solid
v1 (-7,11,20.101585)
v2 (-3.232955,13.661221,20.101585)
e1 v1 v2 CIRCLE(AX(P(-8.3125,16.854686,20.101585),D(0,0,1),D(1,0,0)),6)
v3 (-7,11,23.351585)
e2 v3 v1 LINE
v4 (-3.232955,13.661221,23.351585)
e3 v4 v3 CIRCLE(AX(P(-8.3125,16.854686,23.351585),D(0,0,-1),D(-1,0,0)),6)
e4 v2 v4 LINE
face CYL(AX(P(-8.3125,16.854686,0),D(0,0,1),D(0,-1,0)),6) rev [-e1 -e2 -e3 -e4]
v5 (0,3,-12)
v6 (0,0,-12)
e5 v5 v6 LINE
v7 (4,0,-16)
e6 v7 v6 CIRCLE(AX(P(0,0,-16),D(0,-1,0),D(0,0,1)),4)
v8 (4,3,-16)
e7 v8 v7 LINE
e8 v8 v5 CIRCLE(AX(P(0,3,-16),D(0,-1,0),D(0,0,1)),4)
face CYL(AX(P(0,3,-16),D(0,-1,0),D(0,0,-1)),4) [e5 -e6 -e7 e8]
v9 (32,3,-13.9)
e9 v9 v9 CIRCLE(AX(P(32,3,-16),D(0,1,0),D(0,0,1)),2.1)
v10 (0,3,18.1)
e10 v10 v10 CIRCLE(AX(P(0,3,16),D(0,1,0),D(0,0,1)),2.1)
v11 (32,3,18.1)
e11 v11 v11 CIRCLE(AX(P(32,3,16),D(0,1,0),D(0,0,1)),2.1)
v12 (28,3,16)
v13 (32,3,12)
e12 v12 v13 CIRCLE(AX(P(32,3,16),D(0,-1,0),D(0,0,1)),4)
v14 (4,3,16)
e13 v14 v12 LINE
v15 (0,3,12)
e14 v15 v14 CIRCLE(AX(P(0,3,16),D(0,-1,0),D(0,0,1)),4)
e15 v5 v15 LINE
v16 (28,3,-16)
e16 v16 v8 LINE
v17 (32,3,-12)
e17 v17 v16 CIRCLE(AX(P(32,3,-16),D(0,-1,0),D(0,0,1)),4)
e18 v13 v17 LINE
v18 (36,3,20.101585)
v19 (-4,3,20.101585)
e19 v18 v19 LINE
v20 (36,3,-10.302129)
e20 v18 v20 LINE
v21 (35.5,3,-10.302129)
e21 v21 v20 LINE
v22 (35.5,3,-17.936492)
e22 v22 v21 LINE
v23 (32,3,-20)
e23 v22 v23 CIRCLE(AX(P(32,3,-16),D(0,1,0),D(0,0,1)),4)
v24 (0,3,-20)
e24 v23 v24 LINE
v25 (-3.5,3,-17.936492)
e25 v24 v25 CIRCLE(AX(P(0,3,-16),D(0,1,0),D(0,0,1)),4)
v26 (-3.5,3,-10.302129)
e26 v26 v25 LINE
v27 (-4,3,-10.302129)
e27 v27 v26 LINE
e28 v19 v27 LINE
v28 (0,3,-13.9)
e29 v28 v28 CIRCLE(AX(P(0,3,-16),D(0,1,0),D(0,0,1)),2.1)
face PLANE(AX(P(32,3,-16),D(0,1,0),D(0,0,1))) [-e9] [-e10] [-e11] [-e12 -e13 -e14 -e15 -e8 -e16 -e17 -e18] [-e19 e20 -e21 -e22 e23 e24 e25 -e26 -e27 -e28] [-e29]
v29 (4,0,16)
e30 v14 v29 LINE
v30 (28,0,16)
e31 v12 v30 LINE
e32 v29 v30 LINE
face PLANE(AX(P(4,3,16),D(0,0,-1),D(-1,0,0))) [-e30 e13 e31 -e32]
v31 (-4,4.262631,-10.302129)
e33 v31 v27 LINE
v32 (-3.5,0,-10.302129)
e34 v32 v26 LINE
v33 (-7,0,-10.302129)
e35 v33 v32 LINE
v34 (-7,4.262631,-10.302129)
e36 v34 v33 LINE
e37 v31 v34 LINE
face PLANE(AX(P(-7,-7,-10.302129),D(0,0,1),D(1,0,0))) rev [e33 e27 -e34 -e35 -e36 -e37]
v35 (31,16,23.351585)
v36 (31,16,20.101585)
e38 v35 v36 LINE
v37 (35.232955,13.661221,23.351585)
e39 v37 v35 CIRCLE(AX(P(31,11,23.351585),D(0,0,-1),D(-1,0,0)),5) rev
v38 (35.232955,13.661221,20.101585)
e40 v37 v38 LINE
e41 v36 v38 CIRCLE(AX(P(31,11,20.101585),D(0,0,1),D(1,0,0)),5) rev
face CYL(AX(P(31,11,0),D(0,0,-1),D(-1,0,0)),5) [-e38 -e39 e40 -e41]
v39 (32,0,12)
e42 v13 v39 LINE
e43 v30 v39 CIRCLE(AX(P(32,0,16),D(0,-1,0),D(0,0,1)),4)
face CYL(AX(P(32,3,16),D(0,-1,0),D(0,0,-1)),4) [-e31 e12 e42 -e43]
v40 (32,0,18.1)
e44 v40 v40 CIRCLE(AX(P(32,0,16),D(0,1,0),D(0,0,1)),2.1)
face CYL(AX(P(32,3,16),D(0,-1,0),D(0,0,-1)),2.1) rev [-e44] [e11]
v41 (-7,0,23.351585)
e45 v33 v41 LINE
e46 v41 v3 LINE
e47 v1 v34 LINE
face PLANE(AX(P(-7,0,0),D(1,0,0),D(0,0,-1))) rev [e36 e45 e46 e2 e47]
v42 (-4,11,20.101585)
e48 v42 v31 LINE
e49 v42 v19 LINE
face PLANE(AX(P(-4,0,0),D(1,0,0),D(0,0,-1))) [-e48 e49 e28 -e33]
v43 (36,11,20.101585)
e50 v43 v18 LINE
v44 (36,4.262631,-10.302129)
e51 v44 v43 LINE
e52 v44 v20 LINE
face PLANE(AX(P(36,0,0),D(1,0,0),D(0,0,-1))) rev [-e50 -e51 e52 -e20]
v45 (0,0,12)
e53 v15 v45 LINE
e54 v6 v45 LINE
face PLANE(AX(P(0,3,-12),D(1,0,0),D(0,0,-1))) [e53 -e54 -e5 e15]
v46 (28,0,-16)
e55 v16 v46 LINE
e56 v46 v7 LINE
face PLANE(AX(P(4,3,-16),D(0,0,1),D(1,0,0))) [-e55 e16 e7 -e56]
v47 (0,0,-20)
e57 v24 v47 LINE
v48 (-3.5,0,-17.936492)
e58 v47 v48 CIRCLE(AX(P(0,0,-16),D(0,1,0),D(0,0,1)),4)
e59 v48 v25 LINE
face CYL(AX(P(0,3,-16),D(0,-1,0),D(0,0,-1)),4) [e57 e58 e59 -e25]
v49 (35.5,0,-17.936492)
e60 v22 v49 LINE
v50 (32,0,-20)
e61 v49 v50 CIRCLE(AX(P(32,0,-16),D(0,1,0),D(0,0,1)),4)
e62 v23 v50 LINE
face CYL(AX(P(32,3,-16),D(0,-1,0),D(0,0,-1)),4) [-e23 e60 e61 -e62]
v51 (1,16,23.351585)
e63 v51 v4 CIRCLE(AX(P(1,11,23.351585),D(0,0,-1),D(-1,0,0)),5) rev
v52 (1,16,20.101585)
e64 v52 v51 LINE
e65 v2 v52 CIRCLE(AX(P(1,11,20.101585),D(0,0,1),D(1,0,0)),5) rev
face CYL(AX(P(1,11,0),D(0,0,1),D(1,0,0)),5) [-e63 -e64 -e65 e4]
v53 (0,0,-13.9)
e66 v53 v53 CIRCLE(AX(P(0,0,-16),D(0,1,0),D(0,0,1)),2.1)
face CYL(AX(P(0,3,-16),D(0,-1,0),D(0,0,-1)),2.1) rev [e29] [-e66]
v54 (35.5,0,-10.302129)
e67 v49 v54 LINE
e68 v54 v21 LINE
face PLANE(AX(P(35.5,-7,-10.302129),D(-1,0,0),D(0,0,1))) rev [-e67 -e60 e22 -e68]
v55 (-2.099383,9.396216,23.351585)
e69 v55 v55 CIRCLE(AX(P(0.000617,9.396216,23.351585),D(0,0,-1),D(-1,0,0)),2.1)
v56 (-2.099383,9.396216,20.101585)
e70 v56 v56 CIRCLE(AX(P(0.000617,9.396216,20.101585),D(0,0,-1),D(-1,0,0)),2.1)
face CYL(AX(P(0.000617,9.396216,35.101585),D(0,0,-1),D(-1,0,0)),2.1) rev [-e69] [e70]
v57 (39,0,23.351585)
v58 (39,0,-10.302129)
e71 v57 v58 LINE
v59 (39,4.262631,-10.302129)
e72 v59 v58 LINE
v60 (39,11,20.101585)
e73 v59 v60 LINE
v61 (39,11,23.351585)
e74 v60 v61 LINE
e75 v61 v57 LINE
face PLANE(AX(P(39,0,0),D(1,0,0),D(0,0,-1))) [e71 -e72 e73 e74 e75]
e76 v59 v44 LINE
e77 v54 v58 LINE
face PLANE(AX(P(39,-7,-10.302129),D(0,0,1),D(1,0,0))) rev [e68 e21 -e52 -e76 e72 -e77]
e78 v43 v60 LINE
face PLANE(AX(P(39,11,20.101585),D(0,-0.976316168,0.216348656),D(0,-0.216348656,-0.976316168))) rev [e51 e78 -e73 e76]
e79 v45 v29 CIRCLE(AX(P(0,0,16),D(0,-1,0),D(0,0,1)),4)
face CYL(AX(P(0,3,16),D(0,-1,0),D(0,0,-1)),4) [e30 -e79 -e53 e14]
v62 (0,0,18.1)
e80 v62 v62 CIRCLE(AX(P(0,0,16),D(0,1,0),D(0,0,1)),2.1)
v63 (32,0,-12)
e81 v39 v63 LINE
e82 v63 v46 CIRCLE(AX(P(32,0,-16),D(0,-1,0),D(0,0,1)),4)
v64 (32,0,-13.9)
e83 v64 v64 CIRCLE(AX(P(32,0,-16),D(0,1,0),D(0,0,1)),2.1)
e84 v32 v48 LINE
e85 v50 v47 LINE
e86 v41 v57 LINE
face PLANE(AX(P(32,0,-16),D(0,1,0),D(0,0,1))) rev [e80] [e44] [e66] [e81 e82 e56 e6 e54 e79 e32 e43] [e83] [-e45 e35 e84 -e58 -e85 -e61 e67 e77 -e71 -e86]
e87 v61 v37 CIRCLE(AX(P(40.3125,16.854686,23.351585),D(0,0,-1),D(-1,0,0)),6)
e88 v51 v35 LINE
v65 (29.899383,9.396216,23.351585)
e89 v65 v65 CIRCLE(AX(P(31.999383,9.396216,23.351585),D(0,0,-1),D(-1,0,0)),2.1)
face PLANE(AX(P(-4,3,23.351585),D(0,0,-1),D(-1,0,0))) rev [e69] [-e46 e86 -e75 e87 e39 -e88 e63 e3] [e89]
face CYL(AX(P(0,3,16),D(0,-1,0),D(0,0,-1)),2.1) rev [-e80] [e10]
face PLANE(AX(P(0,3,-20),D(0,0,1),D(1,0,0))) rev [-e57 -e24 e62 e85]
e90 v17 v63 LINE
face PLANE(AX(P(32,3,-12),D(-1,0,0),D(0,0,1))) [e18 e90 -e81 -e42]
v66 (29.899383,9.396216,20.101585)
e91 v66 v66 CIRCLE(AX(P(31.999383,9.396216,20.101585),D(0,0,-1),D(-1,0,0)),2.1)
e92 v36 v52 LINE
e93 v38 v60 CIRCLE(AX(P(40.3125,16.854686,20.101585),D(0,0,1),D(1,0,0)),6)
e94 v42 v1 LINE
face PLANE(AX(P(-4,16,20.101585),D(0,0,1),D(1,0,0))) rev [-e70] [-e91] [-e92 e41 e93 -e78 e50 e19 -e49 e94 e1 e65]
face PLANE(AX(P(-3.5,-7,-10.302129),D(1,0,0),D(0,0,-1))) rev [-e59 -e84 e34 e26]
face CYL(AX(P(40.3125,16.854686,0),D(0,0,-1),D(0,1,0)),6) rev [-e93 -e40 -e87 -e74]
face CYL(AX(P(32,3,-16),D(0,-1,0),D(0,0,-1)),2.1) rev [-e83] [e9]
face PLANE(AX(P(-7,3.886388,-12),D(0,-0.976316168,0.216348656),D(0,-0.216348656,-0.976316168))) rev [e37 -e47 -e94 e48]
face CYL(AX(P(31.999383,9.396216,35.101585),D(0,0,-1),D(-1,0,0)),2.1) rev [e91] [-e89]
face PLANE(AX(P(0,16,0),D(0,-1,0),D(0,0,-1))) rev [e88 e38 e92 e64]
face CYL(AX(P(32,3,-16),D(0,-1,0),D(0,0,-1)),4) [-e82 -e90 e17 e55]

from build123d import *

# Parameters (mm, degrees)
SKETCH1_R           = 2.1
BOSS_EXTRUDE1_DEPTH = 3
SKETCH2_W           = 40
SKETCH2_H           = 3.25
BOSS_EXTRUDE2_DEPTH = 13
SKETCH3_R           = 2.1
CUT_EXTRUDE1_DEPTH  = 15
FILLET1_R           = 5
BOSS_EXTRUDE3_DEPTH = 3
BOSS_EXTRUDE4_DEPTH = 3
FILLET4_R           = 6
SKETCH7_W           = 3.5
SKETCH7_H           = 9.863589554
CUT_EXTRUDE2_DEPTH  = 10
SKETCH8_W           = 3
SKETCH8_H           = 1.69787118
CUT_EXTRUDE3_DEPTH  = 10


with BuildPart() as part:
    # Sketch1 → Boss-Extrude1 (new body)
    with BuildSketch(Plane(origin=(0, 0, 0), x_dir=(1, 0, 0), z_dir=(0, 1, 0))):
        with BuildLine():
            Line((0, 20), (32, 20))
            ThreePointArc((32, 20), (34.828427125, 18.828427125), (36, 16))
            Line((36, 16), (36, -16))
            Line((36, -16), (36, -23.351584796))
            Line((36, -23.351584796), (-4, -23.351584796))
            Line((-4, -23.351584796), (-4, -16))
            Line((-4, -16), (-4, 16))
            ThreePointArc((-4, 16), (-2.828427125, 18.828427125), (0, 20))
        make_face()
        with Locations(Location((0, 16, 0), (0, 0, 270))):
            Circle(SKETCH1_R, mode=Mode.SUBTRACT)
        with Locations(Location((0, -16, 0), (0, 0, 270))):
            Circle(SKETCH1_R, mode=Mode.SUBTRACT)
        with Locations(Location((32, 16, 0), (0, 0, 270))):
            Circle(SKETCH1_R, mode=Mode.SUBTRACT)
        with Locations(Location((32, -16, 0), (0, 0, 270))):
            Circle(SKETCH1_R, mode=Mode.SUBTRACT)
        with BuildLine():
            Line((0, 12), (0, -12))
            ThreePointArc((0, -12), (2.828427125, -13.171572875), (4, -16))
            Line((4, -16), (28, -16))
            ThreePointArc((28, -16), (29.171572875, -13.171572875), (32, -12))
            Line((32, -12), (32, 12))
            ThreePointArc((32, 12), (29.171572875, 13.171572875), (28, 16))
            Line((28, 16), (4, 16))
            ThreePointArc((4, 16), (2.828427125, 13.171572875), (0, 12))
        make_face(mode=Mode.SUBTRACT)
    extrude(amount=BOSS_EXTRUDE1_DEPTH)

    # Sketch2 → Boss-Extrude2 (add)
    with BuildSketch(Plane(origin=(0, 3, 0), x_dir=(1, 0, 0), z_dir=(0, 1, 0))):
        with Locations((16, -21.726584796)):
            Rectangle(SKETCH2_W, SKETCH2_H)
    extrude(amount=BOSS_EXTRUDE2_DEPTH)

    # Sketch3 → Cut-Extrude1 (cut)
    with BuildSketch(Plane(origin=(0, 0, 20.101584796), x_dir=(-1, 0, 0), z_dir=(0, 0, -1))):
        with Locations((-0.000616802, 9.396216068)):
            Circle(SKETCH3_R)
        with Locations((-31.999383198, 9.396216068)):
            Circle(SKETCH3_R)
    extrude(amount=-CUT_EXTRUDE1_DEPTH, mode=Mode.SUBTRACT)

    # Fillet1
    fillet1_edges = [part.edges().sort_by_distance(p)[0] for p in [
        (-4, 16, 21.726584796),
        (36, 16, 21.726584796),
    ]]
    fillet(fillet1_edges, radius=FILLET1_R)

    # Sketch4 → Boss-Extrude3 (add)
    with BuildSketch(Plane(origin=(36, 0, 0), x_dir=(0, 0, -1), z_dir=(1, 0, 0))):
        Polygon((-20.101584796, 11), (12, 3.88638768), (12, 0), (-23.351584796, 0), (-23.351584796, 11), align=None)
    extrude(amount=BOSS_EXTRUDE3_DEPTH)

    # Sketch5 → Boss-Extrude4 (add)
    with BuildSketch(Plane.ZY.offset(4)):
        Polygon((20.101584796, 11), (23.351584796, 11), (23.351584796, 0), (-12, 0), (-12, 3.88638768), align=None)
    extrude(amount=BOSS_EXTRUDE4_DEPTH)

    # Fillet4
    # the kernel refuses this fillet: 6 mm, written as the material it adds along each edge
    with BuildSketch(Plane(origin=(36, 11, 23.351584796), x_dir=(1, 0, 0), z_dir=(0, 0, -1))) as fillet4_piece_1:
        with BuildLine():
            CenterArc((4.3125, -5.854685623), FILLET4_R, 102.635625093, 45.207166298)
            ThreePointArc((-0.767045455, -2.661220738), (-0.195586783, -1.384779274), (0, 0))
            Line((0, 0), (3, 0))
        make_face()
    extrude(amount=3.25)
    with BuildSketch(Plane(origin=(-4, 11, 20.101584796), x_dir=(0.2769558547034986, 0.9608826434822593, 0), z_dir=(0, 0, 1))) as fillet4_piece_2:
        with BuildLine():
            CenterArc((4.431293675, 5.765295861), FILLET4_R, 208.714229398, 45.207166298)
            Line((-0.830867564, 2.88264793), (0, 0))
            ThreePointArc((0, 0), (1.384779274, 0.195586783), (2.769558547, 0))
        make_face()
    extrude(amount=3.25)

    # Sketch7 → Cut-Extrude2 (cut)
    with BuildSketch(Plane(origin=(0, 3, 0), x_dir=(1, 0, 0), z_dir=(0, 1, 0))):
        with Locations((-5.25, 15.233923597)):
            Rectangle(SKETCH7_W, SKETCH7_H)
        with Locations((37.25, 15.233923597)):
            Rectangle(SKETCH7_W, SKETCH7_H)
    extrude(amount=-CUT_EXTRUDE2_DEPTH, mode=Mode.SUBTRACT)

    # Sketch8 → Cut-Extrude3 (cut)
    with BuildSketch(Plane(origin=(0, 3, 0), x_dir=(-1, 0, 0), z_dir=(0, -1, 0))):
        with Locations((5.5, 11.15106441)):
            Rectangle(SKETCH8_W, SKETCH8_H)
        with Locations((-37.5, 11.15106441)):
            Rectangle(SKETCH8_W, SKETCH8_H)
    extrude(amount=-CUT_EXTRUDE3_DEPTH, mode=Mode.SUBTRACT)


solid = part.part
